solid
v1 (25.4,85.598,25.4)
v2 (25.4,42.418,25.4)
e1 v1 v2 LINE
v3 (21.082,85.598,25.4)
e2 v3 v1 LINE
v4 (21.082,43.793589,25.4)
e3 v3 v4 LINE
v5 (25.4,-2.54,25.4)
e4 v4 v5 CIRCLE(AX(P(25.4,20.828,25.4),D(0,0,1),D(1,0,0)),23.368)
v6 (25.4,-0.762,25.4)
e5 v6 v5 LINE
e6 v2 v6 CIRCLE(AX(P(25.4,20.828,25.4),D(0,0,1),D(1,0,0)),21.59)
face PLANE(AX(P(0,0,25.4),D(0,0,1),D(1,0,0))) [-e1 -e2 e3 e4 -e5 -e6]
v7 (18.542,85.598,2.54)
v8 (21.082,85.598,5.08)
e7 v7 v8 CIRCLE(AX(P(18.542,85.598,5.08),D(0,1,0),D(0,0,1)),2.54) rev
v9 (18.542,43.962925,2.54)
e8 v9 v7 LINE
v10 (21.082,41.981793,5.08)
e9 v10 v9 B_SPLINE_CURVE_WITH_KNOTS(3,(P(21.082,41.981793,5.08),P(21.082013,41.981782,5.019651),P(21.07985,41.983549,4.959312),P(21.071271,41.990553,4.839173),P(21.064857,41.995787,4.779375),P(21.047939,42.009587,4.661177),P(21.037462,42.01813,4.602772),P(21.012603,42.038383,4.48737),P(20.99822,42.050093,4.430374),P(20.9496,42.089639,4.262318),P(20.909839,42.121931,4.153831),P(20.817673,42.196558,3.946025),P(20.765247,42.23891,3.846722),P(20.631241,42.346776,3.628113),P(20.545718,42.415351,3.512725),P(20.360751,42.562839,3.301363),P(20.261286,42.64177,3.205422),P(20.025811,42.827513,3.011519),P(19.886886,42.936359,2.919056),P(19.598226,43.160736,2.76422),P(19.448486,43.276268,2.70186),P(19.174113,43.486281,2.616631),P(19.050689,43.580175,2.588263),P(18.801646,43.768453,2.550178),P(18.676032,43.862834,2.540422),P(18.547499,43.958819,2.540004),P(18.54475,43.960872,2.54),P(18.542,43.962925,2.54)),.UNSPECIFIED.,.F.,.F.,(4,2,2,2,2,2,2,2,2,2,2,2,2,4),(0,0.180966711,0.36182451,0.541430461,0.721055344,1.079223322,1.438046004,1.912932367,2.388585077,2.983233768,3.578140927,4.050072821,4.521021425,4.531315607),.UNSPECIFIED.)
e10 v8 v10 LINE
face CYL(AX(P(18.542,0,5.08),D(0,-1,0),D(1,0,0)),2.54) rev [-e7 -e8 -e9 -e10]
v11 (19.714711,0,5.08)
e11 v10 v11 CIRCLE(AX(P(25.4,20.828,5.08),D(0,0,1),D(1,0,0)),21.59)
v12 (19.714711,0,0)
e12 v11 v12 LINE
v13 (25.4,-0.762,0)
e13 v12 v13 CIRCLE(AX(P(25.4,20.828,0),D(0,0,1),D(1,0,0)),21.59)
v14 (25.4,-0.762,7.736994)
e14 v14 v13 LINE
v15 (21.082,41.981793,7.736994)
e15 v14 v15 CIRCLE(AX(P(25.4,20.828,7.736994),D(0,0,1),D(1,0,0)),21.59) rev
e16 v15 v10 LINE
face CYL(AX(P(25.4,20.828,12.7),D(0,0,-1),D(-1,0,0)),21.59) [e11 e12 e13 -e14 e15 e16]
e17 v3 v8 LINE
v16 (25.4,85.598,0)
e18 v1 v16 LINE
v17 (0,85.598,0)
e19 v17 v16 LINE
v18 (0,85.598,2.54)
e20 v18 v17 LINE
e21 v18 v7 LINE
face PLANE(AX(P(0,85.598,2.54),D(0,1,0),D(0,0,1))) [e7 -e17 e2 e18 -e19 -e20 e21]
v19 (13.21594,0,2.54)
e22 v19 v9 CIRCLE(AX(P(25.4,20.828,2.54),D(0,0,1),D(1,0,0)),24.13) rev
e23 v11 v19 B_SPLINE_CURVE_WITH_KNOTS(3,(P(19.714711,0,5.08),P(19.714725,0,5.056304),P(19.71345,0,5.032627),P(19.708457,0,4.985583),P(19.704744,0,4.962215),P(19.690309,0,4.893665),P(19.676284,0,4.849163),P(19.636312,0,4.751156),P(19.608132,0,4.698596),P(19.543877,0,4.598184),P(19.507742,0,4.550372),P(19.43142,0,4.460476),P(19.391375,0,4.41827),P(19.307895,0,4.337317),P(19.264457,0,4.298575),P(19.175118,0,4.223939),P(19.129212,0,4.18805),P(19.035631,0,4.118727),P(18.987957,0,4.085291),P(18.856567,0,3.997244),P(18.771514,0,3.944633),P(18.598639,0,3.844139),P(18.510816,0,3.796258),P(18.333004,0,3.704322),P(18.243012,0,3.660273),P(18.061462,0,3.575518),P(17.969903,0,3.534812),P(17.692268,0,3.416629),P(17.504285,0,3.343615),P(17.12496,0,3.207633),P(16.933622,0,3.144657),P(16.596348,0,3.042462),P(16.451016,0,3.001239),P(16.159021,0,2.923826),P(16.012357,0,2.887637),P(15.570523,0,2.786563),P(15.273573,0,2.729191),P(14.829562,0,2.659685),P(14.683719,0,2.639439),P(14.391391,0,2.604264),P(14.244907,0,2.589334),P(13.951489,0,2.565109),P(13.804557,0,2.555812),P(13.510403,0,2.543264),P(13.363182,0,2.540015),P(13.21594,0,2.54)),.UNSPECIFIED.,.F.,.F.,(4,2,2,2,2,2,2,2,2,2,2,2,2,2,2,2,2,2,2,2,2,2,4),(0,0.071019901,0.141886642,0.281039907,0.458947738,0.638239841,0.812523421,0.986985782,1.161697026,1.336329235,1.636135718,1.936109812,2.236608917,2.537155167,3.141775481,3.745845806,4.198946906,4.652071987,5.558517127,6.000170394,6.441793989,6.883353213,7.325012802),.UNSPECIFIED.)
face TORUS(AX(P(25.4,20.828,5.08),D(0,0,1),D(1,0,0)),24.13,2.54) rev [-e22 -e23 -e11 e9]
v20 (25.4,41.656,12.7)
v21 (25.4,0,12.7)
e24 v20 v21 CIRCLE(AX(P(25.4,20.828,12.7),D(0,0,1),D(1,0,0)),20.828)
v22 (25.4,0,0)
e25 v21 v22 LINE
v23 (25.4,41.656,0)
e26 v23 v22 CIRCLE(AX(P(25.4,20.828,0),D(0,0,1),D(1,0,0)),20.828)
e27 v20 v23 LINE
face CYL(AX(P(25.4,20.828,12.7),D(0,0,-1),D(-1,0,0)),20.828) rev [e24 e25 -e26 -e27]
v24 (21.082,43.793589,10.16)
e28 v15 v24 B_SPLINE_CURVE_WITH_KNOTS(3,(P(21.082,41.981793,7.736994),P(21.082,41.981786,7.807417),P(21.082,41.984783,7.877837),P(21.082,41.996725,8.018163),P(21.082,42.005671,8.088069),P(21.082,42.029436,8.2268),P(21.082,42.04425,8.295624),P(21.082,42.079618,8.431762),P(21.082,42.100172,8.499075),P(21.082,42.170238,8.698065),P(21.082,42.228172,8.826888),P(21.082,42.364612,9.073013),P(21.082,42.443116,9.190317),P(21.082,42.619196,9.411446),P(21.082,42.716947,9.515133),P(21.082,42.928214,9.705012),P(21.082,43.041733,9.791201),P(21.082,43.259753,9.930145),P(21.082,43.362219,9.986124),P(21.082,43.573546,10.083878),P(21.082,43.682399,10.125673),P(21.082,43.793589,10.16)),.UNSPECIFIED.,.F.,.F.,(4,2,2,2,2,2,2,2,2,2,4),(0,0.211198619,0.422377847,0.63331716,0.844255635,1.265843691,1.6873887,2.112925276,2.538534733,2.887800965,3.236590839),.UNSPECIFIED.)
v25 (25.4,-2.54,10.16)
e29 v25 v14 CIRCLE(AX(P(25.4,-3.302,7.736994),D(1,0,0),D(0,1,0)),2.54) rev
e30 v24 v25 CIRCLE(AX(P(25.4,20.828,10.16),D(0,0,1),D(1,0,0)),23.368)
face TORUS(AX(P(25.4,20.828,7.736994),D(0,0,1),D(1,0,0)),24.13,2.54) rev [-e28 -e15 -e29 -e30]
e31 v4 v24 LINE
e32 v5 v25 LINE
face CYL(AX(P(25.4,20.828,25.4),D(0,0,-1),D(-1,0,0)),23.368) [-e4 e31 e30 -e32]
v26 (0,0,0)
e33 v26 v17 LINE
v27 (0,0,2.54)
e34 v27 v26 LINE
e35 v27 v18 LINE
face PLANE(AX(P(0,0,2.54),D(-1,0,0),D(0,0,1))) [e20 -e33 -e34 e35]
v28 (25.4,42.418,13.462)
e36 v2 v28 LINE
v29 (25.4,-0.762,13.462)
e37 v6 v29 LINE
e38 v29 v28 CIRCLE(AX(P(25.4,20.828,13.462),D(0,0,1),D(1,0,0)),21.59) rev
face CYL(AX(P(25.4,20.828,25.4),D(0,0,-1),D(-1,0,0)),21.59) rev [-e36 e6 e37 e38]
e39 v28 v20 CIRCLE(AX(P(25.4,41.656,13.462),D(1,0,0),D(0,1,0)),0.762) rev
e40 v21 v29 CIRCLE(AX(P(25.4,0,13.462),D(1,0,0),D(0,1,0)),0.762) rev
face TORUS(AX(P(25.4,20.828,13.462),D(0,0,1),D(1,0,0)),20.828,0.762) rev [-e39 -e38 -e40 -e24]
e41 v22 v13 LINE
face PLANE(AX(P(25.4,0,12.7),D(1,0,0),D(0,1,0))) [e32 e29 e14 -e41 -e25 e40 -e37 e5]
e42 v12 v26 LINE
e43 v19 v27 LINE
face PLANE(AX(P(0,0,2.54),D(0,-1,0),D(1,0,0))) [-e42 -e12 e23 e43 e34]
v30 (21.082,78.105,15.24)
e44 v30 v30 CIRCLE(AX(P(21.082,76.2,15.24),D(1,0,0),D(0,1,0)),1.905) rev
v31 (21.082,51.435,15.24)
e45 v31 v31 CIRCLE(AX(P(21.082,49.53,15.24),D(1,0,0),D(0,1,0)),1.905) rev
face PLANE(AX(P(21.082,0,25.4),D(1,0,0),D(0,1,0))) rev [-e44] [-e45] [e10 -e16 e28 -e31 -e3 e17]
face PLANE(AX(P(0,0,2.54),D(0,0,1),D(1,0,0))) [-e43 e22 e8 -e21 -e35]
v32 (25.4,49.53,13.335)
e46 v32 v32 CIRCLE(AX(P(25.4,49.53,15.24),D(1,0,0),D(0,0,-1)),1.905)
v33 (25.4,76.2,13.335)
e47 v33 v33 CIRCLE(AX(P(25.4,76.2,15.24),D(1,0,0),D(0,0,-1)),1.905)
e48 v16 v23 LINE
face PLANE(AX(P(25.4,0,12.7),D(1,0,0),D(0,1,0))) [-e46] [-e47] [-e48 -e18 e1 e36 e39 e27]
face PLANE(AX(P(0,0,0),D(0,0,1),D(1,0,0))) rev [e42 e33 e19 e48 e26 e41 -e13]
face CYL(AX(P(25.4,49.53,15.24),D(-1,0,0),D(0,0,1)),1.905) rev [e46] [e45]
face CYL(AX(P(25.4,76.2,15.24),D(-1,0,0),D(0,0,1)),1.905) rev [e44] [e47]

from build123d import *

# Parameters (mm, degrees)
BOSS_EXTRUDE1_DEPTH     = 2.5399999999999996
BOSS_EXTRUDE3_DEPTH     = 12.7
BOSS_EXTRUDE6_DEPTH     = 2.54
BOSS_EXTRUDE7_DEPTH     = 25.4
BOSS_EXTRUDE8_START     = 10.16
BOSS_EXTRUDE8_DEPTH     = 15.239999999999998
FILLET1_R               = 2.5399999999999996
FILLET2_ANGLE           = 169.351542
FILLET3_R               = 0.762
CUT_EXTRUDE1_DEPTH      = 93.8296161634462
CUT_EXTRUDE1_DEPTH_BACK = 93.8296161634462
SKETCH3_R               = 1.9050000000000038
SKETCH3_R_2             = 1.9049999999999983


with BuildPart() as part:
    # Sketch2 → Boss-Extrude1 (new body)
    with BuildSketch(Plane.XY):
        with BuildLine():
            Line((0, 85.598), (0, 0))
            Line((0, 0), (14.804819963776673, 1e-17))
            ThreePointArc((14.804819963776595, -3.0553e-13), (2.268412192290537, 24.14357981267628), (21.081999999999496, 43.793589476431805))
            Line((21.082000000000004, 43.79358947643172), (21.082, 85.598))
            Line((21.082, 85.598), (0, 85.598))
        make_face()
    extrude(amount=BOSS_EXTRUDE1_DEPTH)



with BuildPart() as body_2:
    # Sketch2<4> → Boss-Extrude3 (new body)
    with BuildSketch(Plane.XY):
        with BuildLine():
            ThreePointArc((21.082000000000008, 41.98179341867554), (3.82144132339004, 21.53078406363614), (19.714710561456986, 2.0606e-13))
            Line((19.714710561456965, 2e-17), (25.399999983196594, 2e-17))
            ThreePointArc((25.399999983196587, -3.55e-15), (4.685437224641706, 18.657176878292418), (21.082000000000004, 41.20348674265231))
            Line((21.082000000000004, 41.20348674265231), (21.082000000000004, 41.98179341867554))
        make_face()
        with BuildLine():
            ThreePointArc((25.400000000000105, 42.418000000000006), (23.230011510307612, 42.30867154338064), (21.082000000000008, 41.98179341867554))
            Line((21.082000000000004, 41.98179341867554), (21.082000000000004, 41.20348674265231))
            ThreePointArc((21.082000000000004, 41.20348674265231), (23.229176869936293, 41.542562774482604), (25.39999999999965, 41.656000000000006))
            Line((25.400000000000002, 41.656000000000006), (25.400000000000002, 42.418000000000006))
        make_face()
        with BuildLine():
            Line((25.399999983196594, 2e-17), (19.714710561456965, 2e-17))
            ThreePointArc((19.714710561456986, 2.0606e-13), (22.531936193178055, -0.5706520603518008), (25.4000000000001, -0.7620000000000076))
            Line((25.40000000000001, -0.7620000000000147), (25.40000000000001, 0))
        make_face()
    extrude(amount=BOSS_EXTRUDE3_DEPTH)


with BuildPart() as part_1:
    add(part.part)

    add(body_2.part)  # Boss-Extrude6 merges body 2
    # Sketch2<9> → Boss-Extrude6 (add)
    with BuildSketch(Plane.XY):
        with BuildLine():
            ThreePointArc((21.081999999999496, 43.793589476431805), (2.268412192290537, 24.14357981267628), (14.804819963776595, -3.0553e-13))
            Line((14.804819963776673, 1e-17), (19.714710561456965, 2e-17))
            ThreePointArc((19.714710561456986, 2.0606e-13), (3.82144132339004, 21.53078406363614), (21.082000000000008, 41.98179341867554))
            Line((21.082000000000004, 41.98179341867554), (21.082000000000004, 43.79358947643172))
        make_face()
    extrude(amount=BOSS_EXTRUDE6_DEPTH)

    # Sketch2<10> → Boss-Extrude7 (add)
    with BuildSketch(Plane.XY):
        with BuildLine():
            Line((25.4, 85.598), (21.082, 85.598))
            Line((21.082, 85.598), (21.082000000000004, 43.79358947643172))
            ThreePointArc((21.081999999999496, 43.793589476431805), (23.231644734511608, 44.095179877299884), (25.39999999999975, 44.196))
            Line((25.400000000000002, 44.196), (25.4, 85.598))
        make_face()
        with BuildLine():
            ThreePointArc((25.39999999999975, 44.196), (23.231644734511608, 44.095179877299884), (21.081999999999496, 43.793589476431805))
            Line((21.082000000000004, 43.79358947643172), (21.082000000000004, 41.98179341867554))
            ThreePointArc((21.082000000000008, 41.98179341867554), (23.230011510307612, 42.30867154338064), (25.400000000000105, 42.418000000000006))
            Line((25.400000000000002, 42.418000000000006), (25.400000000000002, 44.196))
        make_face()
    extrude(amount=BOSS_EXTRUDE7_DEPTH)

    # Sketch2<12> → Boss-Extrude8 (add)
    with BuildSketch(Plane.XY.offset(BOSS_EXTRUDE8_START)):
        with BuildLine():
            Line((19.714710561456965, 2e-17), (14.804819963776673, 1e-17))
            ThreePointArc((14.804819963776595, -3.0553e-13), (19.952306910260432, -1.8961295542866416), (25.400000000000006, -2.539999999999999))
            Line((25.40000000000001, -2.5400000000000063), (25.40000000000001, -0.7620000000000147))
            ThreePointArc((25.4000000000001, -0.7620000000000076), (22.531936193178055, -0.5706520603518008), (19.714710561456986, 2.0606e-13))
        make_face()
        with BuildLine():
            ThreePointArc((21.081999999999496, 43.793589476431805), (2.268412192290537, 24.14357981267628), (14.804819963776595, -3.0553e-13))
            Line((14.804819963776673, 1e-17), (19.714710561456965, 2e-17))
            ThreePointArc((19.714710561456986, 2.0606e-13), (3.82144132339004, 21.53078406363614), (21.082000000000008, 41.98179341867554))
            Line((21.082000000000004, 41.98179341867554), (21.082000000000004, 43.79358947643172))
        make_face()
    extrude(amount=BOSS_EXTRUDE8_DEPTH)

    # Fillet1
    fillet1_edges = [part_1.edges().sort_by_distance(p)[0] for p in [
        (21.082, 63.78989670933777, 2.5399999999999996),
        (3.8214413233900366, 21.530784063636144, 2.54),
    ]]
    fillet(fillet1_edges, radius=FILLET1_R)

    # Fillet2: read off the stored shape, not the designer's step
    # Fillet2 outline → Fillet2 (revolve)
    with BuildSketch(Plane(origin=(25.4, 20.828, 0), x_dir=(-0.1847826086956513, 0.982779419566583, 0), z_dir=(0.982779419566583, 0.1847826086956513, 0))):
        with BuildLine():
            ThreePointArc((21.59, 7.736994428), (22.082186532, 9.239678693), (23.368, 10.16))
            Line((23.368, 10.16), (21.59, 10.16))
            Line((21.59, 10.16), (21.59, 7.736994428))
        make_face()
    revolve(axis=Axis((25.4, 20.828, 0), (0, 0, 1)), revolution_arc=FILLET2_ANGLE)

    # Fillet3
    fillet3_edges = [part_1.edges().sort_by_distance(p)[0] for p in [
        (3.809999999999814, 20.827999999999818, 12.7),
    ]]
    fillet(fillet3_edges, radius=FILLET3_R - 0.0001)  # a hair under: the kernel refuses the full size

    # Sketch3 → Cut-Extrude1 (cut, two sides: drawn at the far end of the back side and taken through both)
    with BuildSketch(Plane(origin=(0, 0, 0), x_dir=(0, 0, -1), z_dir=(1, 0, 0)).offset(-CUT_EXTRUDE1_DEPTH_BACK)):
        with Locations(Location((-15.24, 76.2, 0), (0, 0, 90))):
            Circle(SKETCH3_R)
        with Locations(Location((-15.239999999999998, 49.53, 0), (0, 0, 90))):
            Circle(SKETCH3_R_2)
    extrude(amount=CUT_EXTRUDE1_DEPTH + CUT_EXTRUDE1_DEPTH_BACK, mode=Mode.SUBTRACT)


solid = part_1.part
